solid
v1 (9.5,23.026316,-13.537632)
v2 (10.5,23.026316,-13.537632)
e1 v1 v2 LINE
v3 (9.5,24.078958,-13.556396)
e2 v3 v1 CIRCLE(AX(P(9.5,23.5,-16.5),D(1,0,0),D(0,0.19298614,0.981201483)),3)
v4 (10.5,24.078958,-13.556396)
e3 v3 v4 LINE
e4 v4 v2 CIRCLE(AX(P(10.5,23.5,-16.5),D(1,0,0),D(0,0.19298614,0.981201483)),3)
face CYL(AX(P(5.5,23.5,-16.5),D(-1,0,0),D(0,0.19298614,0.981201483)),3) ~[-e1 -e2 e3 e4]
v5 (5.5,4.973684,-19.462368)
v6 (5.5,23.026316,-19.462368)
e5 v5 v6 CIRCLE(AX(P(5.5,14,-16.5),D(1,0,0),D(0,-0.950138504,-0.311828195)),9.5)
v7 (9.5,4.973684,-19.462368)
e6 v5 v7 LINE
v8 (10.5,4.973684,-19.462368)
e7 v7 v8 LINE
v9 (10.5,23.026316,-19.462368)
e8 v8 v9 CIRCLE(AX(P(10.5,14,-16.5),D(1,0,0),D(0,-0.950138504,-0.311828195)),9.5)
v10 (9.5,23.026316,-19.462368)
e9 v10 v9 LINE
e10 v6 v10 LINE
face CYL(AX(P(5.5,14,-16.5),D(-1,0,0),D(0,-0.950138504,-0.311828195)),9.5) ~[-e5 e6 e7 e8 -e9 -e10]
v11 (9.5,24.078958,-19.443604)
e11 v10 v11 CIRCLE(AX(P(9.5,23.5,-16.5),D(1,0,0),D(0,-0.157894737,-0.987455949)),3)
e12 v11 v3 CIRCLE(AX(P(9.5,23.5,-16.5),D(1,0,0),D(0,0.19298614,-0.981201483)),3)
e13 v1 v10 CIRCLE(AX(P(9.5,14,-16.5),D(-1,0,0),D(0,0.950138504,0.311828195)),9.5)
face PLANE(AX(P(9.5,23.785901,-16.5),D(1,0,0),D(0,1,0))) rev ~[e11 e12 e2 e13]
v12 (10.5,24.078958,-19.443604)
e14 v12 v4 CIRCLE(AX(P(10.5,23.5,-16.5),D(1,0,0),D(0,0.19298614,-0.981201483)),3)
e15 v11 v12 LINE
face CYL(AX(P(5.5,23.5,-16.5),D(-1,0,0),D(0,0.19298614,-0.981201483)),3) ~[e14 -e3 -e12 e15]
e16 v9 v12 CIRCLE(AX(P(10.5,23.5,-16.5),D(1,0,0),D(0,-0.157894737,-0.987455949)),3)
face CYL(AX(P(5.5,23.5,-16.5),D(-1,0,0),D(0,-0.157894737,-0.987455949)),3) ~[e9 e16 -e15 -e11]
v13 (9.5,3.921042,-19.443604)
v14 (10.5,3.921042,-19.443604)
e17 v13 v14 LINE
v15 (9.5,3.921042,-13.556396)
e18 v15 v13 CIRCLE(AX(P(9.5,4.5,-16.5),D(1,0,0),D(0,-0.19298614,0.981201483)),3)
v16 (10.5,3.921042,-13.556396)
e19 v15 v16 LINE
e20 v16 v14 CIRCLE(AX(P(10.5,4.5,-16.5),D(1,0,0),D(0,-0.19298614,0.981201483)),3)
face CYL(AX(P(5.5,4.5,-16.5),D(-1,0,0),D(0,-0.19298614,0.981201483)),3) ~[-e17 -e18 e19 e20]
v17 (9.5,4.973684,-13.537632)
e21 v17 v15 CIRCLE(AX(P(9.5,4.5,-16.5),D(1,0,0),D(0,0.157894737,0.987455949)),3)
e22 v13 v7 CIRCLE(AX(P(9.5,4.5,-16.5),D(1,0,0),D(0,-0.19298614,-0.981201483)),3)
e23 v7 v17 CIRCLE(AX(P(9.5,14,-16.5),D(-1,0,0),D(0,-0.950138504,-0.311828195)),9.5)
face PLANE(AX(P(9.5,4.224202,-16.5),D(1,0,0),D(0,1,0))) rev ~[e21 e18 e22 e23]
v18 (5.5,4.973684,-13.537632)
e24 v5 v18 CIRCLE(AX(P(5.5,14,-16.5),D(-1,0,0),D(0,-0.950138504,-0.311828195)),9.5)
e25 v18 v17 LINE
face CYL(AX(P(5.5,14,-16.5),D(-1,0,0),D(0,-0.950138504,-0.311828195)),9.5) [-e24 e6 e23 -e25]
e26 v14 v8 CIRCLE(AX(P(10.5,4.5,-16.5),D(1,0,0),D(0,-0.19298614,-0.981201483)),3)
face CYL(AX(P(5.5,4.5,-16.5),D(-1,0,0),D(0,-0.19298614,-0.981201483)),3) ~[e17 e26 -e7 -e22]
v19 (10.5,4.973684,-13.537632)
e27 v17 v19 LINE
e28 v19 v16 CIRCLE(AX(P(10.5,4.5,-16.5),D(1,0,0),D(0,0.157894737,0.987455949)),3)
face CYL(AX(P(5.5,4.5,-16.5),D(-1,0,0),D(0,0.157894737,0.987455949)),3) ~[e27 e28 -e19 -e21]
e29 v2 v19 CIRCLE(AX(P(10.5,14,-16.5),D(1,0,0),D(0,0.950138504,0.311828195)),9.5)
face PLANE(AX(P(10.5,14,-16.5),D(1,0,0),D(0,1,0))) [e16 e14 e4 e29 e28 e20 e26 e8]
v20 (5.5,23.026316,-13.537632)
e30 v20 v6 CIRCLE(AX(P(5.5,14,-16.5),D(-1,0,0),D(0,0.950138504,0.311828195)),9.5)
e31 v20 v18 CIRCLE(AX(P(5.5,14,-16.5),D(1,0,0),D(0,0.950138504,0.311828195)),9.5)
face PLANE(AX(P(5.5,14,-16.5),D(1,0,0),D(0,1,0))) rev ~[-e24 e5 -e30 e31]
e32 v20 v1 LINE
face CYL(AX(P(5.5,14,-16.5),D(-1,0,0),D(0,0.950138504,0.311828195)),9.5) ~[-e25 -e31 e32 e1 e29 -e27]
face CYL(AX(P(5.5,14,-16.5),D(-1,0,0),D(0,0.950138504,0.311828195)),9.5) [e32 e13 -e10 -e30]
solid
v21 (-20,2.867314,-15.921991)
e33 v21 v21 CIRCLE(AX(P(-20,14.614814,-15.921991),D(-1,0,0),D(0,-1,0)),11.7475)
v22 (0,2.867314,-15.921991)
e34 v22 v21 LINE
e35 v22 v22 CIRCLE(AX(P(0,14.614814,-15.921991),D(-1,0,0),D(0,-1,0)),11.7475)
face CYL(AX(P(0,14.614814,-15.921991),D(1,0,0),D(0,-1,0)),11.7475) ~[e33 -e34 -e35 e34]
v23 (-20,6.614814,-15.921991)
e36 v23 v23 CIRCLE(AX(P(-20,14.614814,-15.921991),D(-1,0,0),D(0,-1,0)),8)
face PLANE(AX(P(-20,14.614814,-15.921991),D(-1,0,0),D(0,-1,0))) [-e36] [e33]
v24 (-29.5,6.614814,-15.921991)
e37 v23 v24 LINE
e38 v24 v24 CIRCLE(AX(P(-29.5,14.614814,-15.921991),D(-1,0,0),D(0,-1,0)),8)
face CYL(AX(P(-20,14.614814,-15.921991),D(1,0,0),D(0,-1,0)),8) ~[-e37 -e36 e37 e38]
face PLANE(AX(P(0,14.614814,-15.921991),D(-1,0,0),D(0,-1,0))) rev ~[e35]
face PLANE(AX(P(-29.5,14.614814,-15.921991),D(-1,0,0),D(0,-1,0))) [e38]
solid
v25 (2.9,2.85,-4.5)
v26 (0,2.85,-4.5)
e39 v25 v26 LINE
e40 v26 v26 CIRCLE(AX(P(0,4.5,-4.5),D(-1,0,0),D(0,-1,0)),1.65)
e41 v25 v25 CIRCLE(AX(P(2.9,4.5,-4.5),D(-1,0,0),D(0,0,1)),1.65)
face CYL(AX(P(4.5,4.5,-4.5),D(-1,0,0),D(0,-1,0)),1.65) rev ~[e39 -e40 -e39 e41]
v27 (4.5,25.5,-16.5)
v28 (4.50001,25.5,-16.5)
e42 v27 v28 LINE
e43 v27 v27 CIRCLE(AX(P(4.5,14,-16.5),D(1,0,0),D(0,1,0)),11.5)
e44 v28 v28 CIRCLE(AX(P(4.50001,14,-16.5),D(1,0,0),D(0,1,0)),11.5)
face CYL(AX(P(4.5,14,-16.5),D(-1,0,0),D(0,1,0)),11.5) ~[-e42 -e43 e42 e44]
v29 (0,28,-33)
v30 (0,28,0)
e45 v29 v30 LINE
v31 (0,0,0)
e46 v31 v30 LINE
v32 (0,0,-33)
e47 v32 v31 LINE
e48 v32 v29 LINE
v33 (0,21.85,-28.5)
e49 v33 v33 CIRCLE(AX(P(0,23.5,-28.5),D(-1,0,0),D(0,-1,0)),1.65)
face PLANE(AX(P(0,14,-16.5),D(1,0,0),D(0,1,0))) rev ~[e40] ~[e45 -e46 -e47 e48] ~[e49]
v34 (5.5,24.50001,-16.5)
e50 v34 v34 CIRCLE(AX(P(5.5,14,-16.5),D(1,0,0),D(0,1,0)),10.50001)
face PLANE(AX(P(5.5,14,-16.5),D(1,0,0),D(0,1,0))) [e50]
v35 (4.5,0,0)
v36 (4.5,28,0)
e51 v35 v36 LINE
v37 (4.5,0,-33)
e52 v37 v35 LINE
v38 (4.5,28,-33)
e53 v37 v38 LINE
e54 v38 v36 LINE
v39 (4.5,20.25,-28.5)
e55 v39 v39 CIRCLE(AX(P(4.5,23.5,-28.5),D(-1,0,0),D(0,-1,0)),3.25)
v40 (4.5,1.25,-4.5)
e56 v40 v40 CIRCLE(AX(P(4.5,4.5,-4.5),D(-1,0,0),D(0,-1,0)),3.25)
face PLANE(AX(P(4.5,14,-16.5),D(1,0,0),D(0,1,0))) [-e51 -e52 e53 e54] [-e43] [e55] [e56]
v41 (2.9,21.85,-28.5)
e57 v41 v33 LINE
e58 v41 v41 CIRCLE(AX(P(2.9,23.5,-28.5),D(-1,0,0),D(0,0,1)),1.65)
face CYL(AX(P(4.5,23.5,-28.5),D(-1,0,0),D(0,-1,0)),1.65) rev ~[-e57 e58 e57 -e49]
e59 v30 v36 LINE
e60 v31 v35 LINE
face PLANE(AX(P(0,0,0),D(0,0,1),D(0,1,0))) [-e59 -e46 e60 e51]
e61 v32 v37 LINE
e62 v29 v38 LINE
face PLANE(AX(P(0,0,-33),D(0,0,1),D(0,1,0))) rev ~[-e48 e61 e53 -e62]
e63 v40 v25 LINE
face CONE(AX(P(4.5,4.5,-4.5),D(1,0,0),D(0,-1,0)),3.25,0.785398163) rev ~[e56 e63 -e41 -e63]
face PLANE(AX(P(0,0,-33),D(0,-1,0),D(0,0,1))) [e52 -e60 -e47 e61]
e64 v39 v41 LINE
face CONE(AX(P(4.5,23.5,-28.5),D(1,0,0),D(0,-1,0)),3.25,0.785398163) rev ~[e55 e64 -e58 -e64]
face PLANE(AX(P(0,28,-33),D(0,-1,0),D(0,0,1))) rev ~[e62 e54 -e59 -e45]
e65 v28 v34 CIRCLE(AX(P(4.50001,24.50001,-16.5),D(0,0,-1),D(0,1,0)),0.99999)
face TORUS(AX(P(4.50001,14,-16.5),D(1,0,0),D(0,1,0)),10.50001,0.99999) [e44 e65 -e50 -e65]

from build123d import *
from build123d import SkipClean  # not in build123d's __all__

# Parameters (mm, degrees)
F0_W            = 28
F0_H            = 33
F1_DEPTH        = 4.5
F2_R            = 11.7475
F3_DEPTH        = 20
F4_R            = 8
F5_DEPTH        = 9.5
F6_R            = 11.5
F7_DEPTH        = 1
F8_R            = 0.99999
F10_DEPTH       = 5
F11_DEPTH       = 4
F13_D           = 3.3
F13_CSINK_D     = 6.5
F13_CSINK_ANGLE = 90
F14_D           = 3.3
F14_CSINK_D     = 6.5
F14_CSINK_ANGLE = 90


# Not quite as in the source:
# - a fillet or chamfer is up to 0.001 mm smaller than in the source, because OpenCascade refuses the exact size


with BuildPart() as f1:
    # F0 (on Right) → F1 (new body)
    with BuildSketch(Plane.YZ):
        with Locations((14, -16.5)):
            Rectangle(F0_W, F0_H)
    extrude(amount=F1_DEPTH)

    # F6 (on face) → F7 (join)
    with BuildSketch(Plane.YZ.offset(4.5)):
        with Locations((14, -16.5)):
            Circle(F6_R)
    extrude(amount=F7_DEPTH)

    # F8 (radius 1 in the source; OpenCascade refuses exactly that, so slightly less here)
    f8_edges = [f1.edges().sort_by_distance(p)[0] for p in [
        (5.5, 2.5, -16.5),
    ]]
    fillet(f8_edges, radius=F8_R)

    # F13 (through all)
    with Locations(Plane.YZ.offset(4.5)):
        with Locations((4.5, -4.5)):
            CounterSinkHole(F13_D / 2, F13_CSINK_D / 2, counter_sink_angle=F13_CSINK_ANGLE)

    # F14 (through all)
    with Locations(Plane.YZ.offset(4.5)):
        with Locations((23.5, -28.5)):
            CounterSinkHole(F14_D / 2, F14_CSINK_D / 2, counter_sink_angle=F14_CSINK_ANGLE)


with BuildPart() as f3:
    # F2 (on face) → F3 (new body)
    with BuildSketch(Plane(origin=(0, 0, 0), x_dir=(0, -1, 0), z_dir=(-1, 0, 0))):
        with Locations((-14.6148139611, -15.9219913185)):
            Circle(F2_R)
    extrude(amount=F3_DEPTH)

    # F4 (on face) → F5 (join)
    with BuildSketch(Plane(origin=(-20, 0, 0), x_dir=(0, -1, 0), z_dir=(-1, 0, 0))):
        with Locations((-14.6148139611, -15.9219913185)):
            Circle(F4_R)
    extrude(amount=F5_DEPTH)


with BuildPart() as f10:
    # F9 (on face) → F10 (new body)
    with BuildSketch(Plane.YZ.offset(5.5)):
        with BuildLine():
            ThreePointArc((4.9736842105, -13.5376321517), (4.5, -16.5), (4.9736842105, -19.4623678483))
            ThreePointArc((4.9736842105, -19.4623678483), (14, -26), (23.0263157895, -19.4623678483))
            ThreePointArc((23.0263157895, -19.4623678483), (23.5, -16.5), (23.0263157895, -13.5376321517))
            ThreePointArc((23.0263157895, -13.5376321517), (14, -7), (4.9736842105, -13.5376321517))
        make_face()
        with BuildLine():
            ThreePointArc((3.9210415789, -13.5563955519), (1.5, -16.5), (3.9210415789, -19.4436044481))
            ThreePointArc((3.9210415789, -19.4436044481), (3.49999, -16.5), (3.9210415789, -13.5563955519))
        make_face()
        with BuildLine():
            ThreePointArc((24.50001, -16.5), (24.3942141168, -17.9867827329), (24.0789584211, -19.4436044481))
            ThreePointArc((24.0789584211, -19.4436044481), (26.5, -16.5), (24.0789584211, -13.5563955519))
            ThreePointArc((24.0789584211, -13.5563955519), (24.3942141168, -15.0132172671), (24.50001, -16.5))
        make_face()
        with BuildLine():
            ThreePointArc((3.9210415789, -19.4436044481), (4.4465333642, -19.4995235153), (4.9736842105, -19.4623678483))
            ThreePointArc((4.9736842105, -19.4623678483), (4.5, -16.5), (4.9736842105, -13.5376321517))
            ThreePointArc((4.9736842105, -13.5376321517), (4.4465333642, -13.5004764847), (3.9210415789, -13.5563955519))
            ThreePointArc((3.9210415789, -13.5563955519), (3.49999, -16.5), (3.9210415789, -19.4436044481))
        make_face()
        with BuildLine():
            ThreePointArc((23.0263157895, -13.5376321517), (23.5, -16.5), (23.0263157895, -19.4623678483))
            ThreePointArc((23.0263157895, -19.4623678483), (23.5534666358, -19.4995235153), (24.0789584211, -19.4436044481))
            ThreePointArc((24.0789584211, -19.4436044481), (24.3942141168, -17.9867827329), (24.50001, -16.5))
            ThreePointArc((24.50001, -16.5), (24.3942141168, -15.0132172671), (24.0789584211, -13.5563955519))
            ThreePointArc((24.0789584211, -13.5563955519), (23.5534666358, -13.5004764847), (23.0263157895, -13.5376321517))
        make_face()
    extrude(amount=F10_DEPTH)

    # F9 (on face) → F11 (cut)
    with BuildSketch(Plane.YZ.offset(5.5)):
        with BuildLine():
            ThreePointArc((3.9210415789, -19.4436044481), (4.4465333642, -19.4995235153), (4.9736842105, -19.4623678483))
            ThreePointArc((4.9736842105, -19.4623678483), (4.5, -16.5), (4.9736842105, -13.5376321517))
            ThreePointArc((4.9736842105, -13.5376321517), (4.4465333642, -13.5004764847), (3.9210415789, -13.5563955519))
            ThreePointArc((3.9210415789, -13.5563955519), (3.49999, -16.5), (3.9210415789, -19.4436044481))
        make_face()
        with BuildLine():
            ThreePointArc((3.9210415789, -13.5563955519), (1.5, -16.5), (3.9210415789, -19.4436044481))
            ThreePointArc((3.9210415789, -19.4436044481), (3.49999, -16.5), (3.9210415789, -13.5563955519))
        make_face()
        with BuildLine():
            ThreePointArc((23.0263157895, -13.5376321517), (23.5, -16.5), (23.0263157895, -19.4623678483))
            ThreePointArc((23.0263157895, -19.4623678483), (23.5534666358, -19.4995235153), (24.0789584211, -19.4436044481))
            ThreePointArc((24.0789584211, -19.4436044481), (24.3942141168, -17.9867827329), (24.50001, -16.5))
            ThreePointArc((24.50001, -16.5), (24.3942141168, -15.0132172671), (24.0789584211, -13.5563955519))
            ThreePointArc((24.0789584211, -13.5563955519), (23.5534666358, -13.5004764847), (23.0263157895, -13.5376321517))
        make_face()
        with BuildLine():
            ThreePointArc((24.50001, -16.5), (24.3942141168, -17.9867827329), (24.0789584211, -19.4436044481))
            ThreePointArc((24.0789584211, -19.4436044481), (26.5, -16.5), (24.0789584211, -13.5563955519))
            ThreePointArc((24.0789584211, -13.5563955519), (24.3942141168, -15.0132172671), (24.50001, -16.5))
        make_face()
    with SkipClean():  # cleaning this boolean's faces spoils the solid; the shape is the same uncleaned
        extrude(amount=F11_DEPTH, mode=Mode.SUBTRACT)


solid = Compound([f1.part, f3.part, f10.part])
